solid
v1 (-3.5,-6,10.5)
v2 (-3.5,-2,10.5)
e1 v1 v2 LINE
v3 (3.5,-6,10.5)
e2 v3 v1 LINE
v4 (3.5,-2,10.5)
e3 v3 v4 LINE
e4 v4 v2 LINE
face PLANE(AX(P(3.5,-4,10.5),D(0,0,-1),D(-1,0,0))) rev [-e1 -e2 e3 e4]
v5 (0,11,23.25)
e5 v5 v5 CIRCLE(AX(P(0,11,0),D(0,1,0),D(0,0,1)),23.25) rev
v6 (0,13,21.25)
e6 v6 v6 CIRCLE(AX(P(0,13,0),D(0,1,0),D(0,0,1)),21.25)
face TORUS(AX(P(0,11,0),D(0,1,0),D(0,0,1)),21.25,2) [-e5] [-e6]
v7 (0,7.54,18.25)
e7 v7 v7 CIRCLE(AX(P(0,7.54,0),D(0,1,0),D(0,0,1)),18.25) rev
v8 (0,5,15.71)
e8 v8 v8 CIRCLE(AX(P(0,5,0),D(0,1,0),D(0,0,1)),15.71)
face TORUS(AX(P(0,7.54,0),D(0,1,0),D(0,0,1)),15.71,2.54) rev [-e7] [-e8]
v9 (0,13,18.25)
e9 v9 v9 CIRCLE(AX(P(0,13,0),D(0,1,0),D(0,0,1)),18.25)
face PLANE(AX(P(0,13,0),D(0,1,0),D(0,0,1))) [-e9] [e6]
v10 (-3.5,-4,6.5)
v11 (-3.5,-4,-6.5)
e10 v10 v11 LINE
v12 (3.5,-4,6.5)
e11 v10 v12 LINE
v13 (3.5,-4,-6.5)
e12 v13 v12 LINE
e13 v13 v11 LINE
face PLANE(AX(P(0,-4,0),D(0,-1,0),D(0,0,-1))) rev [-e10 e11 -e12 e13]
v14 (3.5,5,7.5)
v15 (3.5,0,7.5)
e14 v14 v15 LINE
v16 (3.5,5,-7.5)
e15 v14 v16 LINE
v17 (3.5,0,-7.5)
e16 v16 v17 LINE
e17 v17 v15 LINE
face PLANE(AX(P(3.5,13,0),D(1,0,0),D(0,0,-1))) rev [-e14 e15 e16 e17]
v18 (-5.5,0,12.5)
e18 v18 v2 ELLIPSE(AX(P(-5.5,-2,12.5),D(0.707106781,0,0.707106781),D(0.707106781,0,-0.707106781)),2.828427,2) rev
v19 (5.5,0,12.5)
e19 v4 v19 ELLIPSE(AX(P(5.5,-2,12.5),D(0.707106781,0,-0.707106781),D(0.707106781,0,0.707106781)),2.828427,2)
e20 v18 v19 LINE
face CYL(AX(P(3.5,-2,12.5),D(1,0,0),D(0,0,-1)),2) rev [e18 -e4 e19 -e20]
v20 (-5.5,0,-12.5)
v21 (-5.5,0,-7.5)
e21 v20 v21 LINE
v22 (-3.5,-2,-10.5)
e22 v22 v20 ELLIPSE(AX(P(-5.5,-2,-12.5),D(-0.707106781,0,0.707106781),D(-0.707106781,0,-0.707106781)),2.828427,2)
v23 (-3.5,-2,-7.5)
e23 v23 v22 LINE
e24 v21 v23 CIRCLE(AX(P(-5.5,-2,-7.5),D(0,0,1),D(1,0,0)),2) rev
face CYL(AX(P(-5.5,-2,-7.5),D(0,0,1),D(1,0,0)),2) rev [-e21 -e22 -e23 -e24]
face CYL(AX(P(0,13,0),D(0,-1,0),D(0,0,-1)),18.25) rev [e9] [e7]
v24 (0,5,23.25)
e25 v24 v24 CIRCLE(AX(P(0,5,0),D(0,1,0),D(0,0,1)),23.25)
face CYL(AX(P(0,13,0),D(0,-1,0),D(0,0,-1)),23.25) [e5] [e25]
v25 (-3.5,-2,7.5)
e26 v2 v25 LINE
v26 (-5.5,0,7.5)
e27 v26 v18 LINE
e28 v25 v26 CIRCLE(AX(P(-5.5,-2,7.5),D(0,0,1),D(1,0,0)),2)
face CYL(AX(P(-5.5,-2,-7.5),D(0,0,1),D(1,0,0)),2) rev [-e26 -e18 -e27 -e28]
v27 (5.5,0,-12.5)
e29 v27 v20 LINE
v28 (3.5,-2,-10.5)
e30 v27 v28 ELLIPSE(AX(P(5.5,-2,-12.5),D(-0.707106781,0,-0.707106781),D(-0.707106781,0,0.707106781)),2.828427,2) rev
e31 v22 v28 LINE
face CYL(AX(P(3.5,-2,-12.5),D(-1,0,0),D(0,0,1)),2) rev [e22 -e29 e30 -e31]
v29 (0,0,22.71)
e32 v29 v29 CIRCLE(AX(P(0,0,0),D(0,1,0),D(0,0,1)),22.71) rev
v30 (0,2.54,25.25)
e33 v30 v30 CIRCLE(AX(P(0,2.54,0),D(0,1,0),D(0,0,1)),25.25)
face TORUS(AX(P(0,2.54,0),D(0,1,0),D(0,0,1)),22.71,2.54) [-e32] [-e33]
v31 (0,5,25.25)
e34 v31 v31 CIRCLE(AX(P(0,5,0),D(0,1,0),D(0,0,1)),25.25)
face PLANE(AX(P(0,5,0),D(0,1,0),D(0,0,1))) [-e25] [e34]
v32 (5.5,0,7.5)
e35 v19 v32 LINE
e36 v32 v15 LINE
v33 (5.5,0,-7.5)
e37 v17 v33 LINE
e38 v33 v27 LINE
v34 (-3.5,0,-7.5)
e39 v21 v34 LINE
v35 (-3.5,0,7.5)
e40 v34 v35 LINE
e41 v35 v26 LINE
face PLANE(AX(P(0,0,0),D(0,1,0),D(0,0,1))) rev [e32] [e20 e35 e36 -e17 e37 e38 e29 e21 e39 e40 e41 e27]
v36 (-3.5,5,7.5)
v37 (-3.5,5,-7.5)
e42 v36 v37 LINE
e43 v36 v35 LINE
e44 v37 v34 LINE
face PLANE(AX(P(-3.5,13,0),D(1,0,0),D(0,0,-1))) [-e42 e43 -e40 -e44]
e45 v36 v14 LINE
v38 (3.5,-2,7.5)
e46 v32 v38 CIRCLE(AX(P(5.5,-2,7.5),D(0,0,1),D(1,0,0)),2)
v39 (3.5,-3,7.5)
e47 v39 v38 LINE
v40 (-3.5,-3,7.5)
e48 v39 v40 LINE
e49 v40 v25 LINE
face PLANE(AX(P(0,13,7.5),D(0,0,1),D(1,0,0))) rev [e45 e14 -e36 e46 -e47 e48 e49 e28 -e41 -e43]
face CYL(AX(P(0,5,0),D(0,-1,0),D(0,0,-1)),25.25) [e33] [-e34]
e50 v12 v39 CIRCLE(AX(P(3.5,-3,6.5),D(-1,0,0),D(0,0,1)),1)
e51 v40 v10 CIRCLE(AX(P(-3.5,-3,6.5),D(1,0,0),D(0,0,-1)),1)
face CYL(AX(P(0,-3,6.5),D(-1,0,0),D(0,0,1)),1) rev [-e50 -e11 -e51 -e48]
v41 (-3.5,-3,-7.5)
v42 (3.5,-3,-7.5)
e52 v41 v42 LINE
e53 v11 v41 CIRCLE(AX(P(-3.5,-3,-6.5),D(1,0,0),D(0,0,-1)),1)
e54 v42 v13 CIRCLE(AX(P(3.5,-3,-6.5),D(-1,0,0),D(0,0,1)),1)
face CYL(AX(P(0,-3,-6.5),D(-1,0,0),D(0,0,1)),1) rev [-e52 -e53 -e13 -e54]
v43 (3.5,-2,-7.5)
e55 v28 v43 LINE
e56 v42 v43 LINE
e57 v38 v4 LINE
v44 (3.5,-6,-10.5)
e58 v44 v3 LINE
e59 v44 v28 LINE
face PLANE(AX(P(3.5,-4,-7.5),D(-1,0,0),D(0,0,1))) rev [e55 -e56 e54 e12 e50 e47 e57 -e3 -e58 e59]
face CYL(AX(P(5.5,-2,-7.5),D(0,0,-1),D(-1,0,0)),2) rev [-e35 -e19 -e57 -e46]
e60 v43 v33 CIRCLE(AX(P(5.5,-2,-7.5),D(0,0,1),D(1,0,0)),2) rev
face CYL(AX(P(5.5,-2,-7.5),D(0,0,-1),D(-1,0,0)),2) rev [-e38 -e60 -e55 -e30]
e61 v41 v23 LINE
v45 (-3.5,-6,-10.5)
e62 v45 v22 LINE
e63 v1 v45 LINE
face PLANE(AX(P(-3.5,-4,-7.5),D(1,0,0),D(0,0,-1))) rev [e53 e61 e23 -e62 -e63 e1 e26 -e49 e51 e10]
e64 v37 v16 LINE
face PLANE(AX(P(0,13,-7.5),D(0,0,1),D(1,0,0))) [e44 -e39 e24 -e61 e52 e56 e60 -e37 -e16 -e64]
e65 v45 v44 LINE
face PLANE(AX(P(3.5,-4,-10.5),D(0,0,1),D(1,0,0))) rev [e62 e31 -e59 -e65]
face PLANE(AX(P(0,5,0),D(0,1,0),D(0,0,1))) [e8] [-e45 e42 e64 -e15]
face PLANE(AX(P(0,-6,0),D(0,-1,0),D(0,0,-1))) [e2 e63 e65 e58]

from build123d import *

# Parameters (mm, degrees)
SKETCH1_R           = 25.25
BOSS_EXTRUDE1_DEPTH = 5
SKETCH2_R           = 23.25
SKETCH2_R_2         = 18.25
BOSS_EXTRUDE2_DEPTH = 8
FILLET1_R           = 2.54
FILLET3_R           = 2
SKETCH3_W           = 7
SKETCH3_H           = 15
CUT_EXTRUDE1_DEPTH  = 39.001644834
SKETCH4_W           = 7
SKETCH4_H           = 3
BOSS_EXTRUDE3_DEPTH = 4
SKETCH5_W           = 7
SKETCH5_H           = 21
BOSS_EXTRUDE4_DEPTH = 2
FILLET4_R           = 2
FILLET5_R           = 1
FILLET6_START       = -12.5
FILLET6_DEPTH       = 5
FILLET6_START_2     = 7.5
FILLET6_2_DEPTH     = 5
FILLET6_START_3     = -6
FILLET6_3_DEPTH     = 12


with BuildPart() as part:
    # Sketch1 → Boss-Extrude1 (new body)
    with BuildSketch(Plane(origin=(0, 0, 0), x_dir=(1, 0, 0), z_dir=(0, 1, 0))):
        with Locations(Location((0, 0, 0), (0, 0, 270))):
            Circle(SKETCH1_R)
    extrude(amount=BOSS_EXTRUDE1_DEPTH)

    # Sketch2 → Boss-Extrude2 (add)
    with BuildSketch(Plane(origin=(0, 5, 0), x_dir=(1, 0, 0), z_dir=(0, 1, 0))):
        with Locations(Location((0, 0, 0), (0, 0, 270))):
            Circle(SKETCH2_R)
        with Locations(Location((0, 0, 0), (0, 0, 270))):
            Circle(SKETCH2_R_2, mode=Mode.SUBTRACT)
    extrude(amount=BOSS_EXTRUDE2_DEPTH)

    # Fillet1
    fillet1_edges = [part.edges().sort_by_distance(p)[0] for p in [
        (0, 0, -25.25),
        (0, 5, -18.25),
    ]]
    fillet(fillet1_edges, radius=FILLET1_R)

    # Fillet3
    fillet3_edges = [part.edges().sort_by_distance(p)[0] for p in [
        (0, 13, -23.25),
    ]]
    fillet(fillet3_edges, radius=FILLET3_R)

    # Sketch3 → Cut-Extrude1 (cut, through all)
    with BuildSketch(Plane(origin=(0, 0, 0), x_dir=(-1, 0, 0), z_dir=(0, -1, 0))):
        Rectangle(SKETCH3_W, SKETCH3_H)
    extrude(amount=-CUT_EXTRUDE1_DEPTH, mode=Mode.SUBTRACT)

    # Sketch4 → Boss-Extrude3 (add)
    with BuildSketch(Plane(origin=(0, 0, 0), x_dir=(-1, 0, 0), z_dir=(0, -1, 0))):
        with Locations((0, 9)):
            Rectangle(SKETCH4_W, SKETCH4_H)
        with Locations((0, -9)):
            Rectangle(SKETCH4_W, SKETCH4_H)
    extrude(amount=BOSS_EXTRUDE3_DEPTH)

    # Sketch5 → Boss-Extrude4 (add)
    with BuildSketch(Plane(origin=(0, -4, 0), x_dir=(-1, 0, 0), z_dir=(0, -1, 0))):
        Rectangle(SKETCH5_W, SKETCH5_H)
    extrude(amount=BOSS_EXTRUDE4_DEPTH)

    # Fillet4
    fillet4_edges = [part.edges().sort_by_distance(p)[0] for p in [
        (0, 0, -10.5),
        (0, 0, 10.5),
    ]]
    fillet(fillet4_edges, radius=FILLET4_R)

    # Fillet5
    fillet5_edges = [part.edges().sort_by_distance(p)[0] for p in [
        (0, -4, -7.5),
        (0, -4, 7.5),
    ]]
    fillet(fillet5_edges, radius=FILLET5_R)

    # Fillet6: read off the stored shape, not the designer's step
    # Fillet6 outline → Fillet6 (add)
    with BuildSketch(Plane.XY.offset(FILLET6_START)):
        with BuildLine():
            Line((5.5, 0), (3.5, 0))
            Line((3.5, 0), (3.5, -2))
            ThreePointArc((3.5, -2), (4.085786438, -0.585786438), (5.5, 0))
        make_face()
        with BuildLine():
            ThreePointArc((-5.5, 0), (-4.085786438, -0.585786438), (-3.5, -2))
            Line((-3.5, -2), (-3.5, 0))
            Line((-3.5, 0), (-5.5, 0))
        make_face()
    extrude(amount=FILLET6_DEPTH)

    # Fillet6 2 outline → Fillet6 2 (add)
    with BuildSketch(Plane.XY.offset(FILLET6_START_2)):
        with BuildLine():
            Line((5.5, 0), (3.5, 0))
            Line((3.5, 0), (3.5, -2))
            ThreePointArc((3.5, -2), (4.085786438, -0.585786438), (5.5, 0))
        make_face()
        with BuildLine():
            ThreePointArc((-5.5, 0), (-4.085786438, -0.585786438), (-3.5, -2))
            Line((-3.5, -2), (-3.5, 0))
            Line((-3.5, 0), (-5.5, 0))
        make_face()
    extrude(amount=FILLET6_2_DEPTH)

    # Fillet6 3 outline → Fillet6 3 (cut)
    with BuildSketch(Plane.YZ.offset(FILLET6_START_3)):
        with BuildLine():
            Line((-2, -10.5), (-2, -12.5))
            Line((-2, -12.5), (0, -12.5))
            ThreePointArc((0, -12.5), (-0.585786438, -11.085786438), (-2, -10.5))
        make_face()
        with BuildLine():
            Line((-2, 12.5), (-2, 10.5))
            ThreePointArc((-2, 10.5), (-0.585786438, 11.085786438), (0, 12.5))
            Line((0, 12.5), (-2, 12.5))
        make_face()
    extrude(amount=FILLET6_3_DEPTH, mode=Mode.SUBTRACT)


solid = part.part
